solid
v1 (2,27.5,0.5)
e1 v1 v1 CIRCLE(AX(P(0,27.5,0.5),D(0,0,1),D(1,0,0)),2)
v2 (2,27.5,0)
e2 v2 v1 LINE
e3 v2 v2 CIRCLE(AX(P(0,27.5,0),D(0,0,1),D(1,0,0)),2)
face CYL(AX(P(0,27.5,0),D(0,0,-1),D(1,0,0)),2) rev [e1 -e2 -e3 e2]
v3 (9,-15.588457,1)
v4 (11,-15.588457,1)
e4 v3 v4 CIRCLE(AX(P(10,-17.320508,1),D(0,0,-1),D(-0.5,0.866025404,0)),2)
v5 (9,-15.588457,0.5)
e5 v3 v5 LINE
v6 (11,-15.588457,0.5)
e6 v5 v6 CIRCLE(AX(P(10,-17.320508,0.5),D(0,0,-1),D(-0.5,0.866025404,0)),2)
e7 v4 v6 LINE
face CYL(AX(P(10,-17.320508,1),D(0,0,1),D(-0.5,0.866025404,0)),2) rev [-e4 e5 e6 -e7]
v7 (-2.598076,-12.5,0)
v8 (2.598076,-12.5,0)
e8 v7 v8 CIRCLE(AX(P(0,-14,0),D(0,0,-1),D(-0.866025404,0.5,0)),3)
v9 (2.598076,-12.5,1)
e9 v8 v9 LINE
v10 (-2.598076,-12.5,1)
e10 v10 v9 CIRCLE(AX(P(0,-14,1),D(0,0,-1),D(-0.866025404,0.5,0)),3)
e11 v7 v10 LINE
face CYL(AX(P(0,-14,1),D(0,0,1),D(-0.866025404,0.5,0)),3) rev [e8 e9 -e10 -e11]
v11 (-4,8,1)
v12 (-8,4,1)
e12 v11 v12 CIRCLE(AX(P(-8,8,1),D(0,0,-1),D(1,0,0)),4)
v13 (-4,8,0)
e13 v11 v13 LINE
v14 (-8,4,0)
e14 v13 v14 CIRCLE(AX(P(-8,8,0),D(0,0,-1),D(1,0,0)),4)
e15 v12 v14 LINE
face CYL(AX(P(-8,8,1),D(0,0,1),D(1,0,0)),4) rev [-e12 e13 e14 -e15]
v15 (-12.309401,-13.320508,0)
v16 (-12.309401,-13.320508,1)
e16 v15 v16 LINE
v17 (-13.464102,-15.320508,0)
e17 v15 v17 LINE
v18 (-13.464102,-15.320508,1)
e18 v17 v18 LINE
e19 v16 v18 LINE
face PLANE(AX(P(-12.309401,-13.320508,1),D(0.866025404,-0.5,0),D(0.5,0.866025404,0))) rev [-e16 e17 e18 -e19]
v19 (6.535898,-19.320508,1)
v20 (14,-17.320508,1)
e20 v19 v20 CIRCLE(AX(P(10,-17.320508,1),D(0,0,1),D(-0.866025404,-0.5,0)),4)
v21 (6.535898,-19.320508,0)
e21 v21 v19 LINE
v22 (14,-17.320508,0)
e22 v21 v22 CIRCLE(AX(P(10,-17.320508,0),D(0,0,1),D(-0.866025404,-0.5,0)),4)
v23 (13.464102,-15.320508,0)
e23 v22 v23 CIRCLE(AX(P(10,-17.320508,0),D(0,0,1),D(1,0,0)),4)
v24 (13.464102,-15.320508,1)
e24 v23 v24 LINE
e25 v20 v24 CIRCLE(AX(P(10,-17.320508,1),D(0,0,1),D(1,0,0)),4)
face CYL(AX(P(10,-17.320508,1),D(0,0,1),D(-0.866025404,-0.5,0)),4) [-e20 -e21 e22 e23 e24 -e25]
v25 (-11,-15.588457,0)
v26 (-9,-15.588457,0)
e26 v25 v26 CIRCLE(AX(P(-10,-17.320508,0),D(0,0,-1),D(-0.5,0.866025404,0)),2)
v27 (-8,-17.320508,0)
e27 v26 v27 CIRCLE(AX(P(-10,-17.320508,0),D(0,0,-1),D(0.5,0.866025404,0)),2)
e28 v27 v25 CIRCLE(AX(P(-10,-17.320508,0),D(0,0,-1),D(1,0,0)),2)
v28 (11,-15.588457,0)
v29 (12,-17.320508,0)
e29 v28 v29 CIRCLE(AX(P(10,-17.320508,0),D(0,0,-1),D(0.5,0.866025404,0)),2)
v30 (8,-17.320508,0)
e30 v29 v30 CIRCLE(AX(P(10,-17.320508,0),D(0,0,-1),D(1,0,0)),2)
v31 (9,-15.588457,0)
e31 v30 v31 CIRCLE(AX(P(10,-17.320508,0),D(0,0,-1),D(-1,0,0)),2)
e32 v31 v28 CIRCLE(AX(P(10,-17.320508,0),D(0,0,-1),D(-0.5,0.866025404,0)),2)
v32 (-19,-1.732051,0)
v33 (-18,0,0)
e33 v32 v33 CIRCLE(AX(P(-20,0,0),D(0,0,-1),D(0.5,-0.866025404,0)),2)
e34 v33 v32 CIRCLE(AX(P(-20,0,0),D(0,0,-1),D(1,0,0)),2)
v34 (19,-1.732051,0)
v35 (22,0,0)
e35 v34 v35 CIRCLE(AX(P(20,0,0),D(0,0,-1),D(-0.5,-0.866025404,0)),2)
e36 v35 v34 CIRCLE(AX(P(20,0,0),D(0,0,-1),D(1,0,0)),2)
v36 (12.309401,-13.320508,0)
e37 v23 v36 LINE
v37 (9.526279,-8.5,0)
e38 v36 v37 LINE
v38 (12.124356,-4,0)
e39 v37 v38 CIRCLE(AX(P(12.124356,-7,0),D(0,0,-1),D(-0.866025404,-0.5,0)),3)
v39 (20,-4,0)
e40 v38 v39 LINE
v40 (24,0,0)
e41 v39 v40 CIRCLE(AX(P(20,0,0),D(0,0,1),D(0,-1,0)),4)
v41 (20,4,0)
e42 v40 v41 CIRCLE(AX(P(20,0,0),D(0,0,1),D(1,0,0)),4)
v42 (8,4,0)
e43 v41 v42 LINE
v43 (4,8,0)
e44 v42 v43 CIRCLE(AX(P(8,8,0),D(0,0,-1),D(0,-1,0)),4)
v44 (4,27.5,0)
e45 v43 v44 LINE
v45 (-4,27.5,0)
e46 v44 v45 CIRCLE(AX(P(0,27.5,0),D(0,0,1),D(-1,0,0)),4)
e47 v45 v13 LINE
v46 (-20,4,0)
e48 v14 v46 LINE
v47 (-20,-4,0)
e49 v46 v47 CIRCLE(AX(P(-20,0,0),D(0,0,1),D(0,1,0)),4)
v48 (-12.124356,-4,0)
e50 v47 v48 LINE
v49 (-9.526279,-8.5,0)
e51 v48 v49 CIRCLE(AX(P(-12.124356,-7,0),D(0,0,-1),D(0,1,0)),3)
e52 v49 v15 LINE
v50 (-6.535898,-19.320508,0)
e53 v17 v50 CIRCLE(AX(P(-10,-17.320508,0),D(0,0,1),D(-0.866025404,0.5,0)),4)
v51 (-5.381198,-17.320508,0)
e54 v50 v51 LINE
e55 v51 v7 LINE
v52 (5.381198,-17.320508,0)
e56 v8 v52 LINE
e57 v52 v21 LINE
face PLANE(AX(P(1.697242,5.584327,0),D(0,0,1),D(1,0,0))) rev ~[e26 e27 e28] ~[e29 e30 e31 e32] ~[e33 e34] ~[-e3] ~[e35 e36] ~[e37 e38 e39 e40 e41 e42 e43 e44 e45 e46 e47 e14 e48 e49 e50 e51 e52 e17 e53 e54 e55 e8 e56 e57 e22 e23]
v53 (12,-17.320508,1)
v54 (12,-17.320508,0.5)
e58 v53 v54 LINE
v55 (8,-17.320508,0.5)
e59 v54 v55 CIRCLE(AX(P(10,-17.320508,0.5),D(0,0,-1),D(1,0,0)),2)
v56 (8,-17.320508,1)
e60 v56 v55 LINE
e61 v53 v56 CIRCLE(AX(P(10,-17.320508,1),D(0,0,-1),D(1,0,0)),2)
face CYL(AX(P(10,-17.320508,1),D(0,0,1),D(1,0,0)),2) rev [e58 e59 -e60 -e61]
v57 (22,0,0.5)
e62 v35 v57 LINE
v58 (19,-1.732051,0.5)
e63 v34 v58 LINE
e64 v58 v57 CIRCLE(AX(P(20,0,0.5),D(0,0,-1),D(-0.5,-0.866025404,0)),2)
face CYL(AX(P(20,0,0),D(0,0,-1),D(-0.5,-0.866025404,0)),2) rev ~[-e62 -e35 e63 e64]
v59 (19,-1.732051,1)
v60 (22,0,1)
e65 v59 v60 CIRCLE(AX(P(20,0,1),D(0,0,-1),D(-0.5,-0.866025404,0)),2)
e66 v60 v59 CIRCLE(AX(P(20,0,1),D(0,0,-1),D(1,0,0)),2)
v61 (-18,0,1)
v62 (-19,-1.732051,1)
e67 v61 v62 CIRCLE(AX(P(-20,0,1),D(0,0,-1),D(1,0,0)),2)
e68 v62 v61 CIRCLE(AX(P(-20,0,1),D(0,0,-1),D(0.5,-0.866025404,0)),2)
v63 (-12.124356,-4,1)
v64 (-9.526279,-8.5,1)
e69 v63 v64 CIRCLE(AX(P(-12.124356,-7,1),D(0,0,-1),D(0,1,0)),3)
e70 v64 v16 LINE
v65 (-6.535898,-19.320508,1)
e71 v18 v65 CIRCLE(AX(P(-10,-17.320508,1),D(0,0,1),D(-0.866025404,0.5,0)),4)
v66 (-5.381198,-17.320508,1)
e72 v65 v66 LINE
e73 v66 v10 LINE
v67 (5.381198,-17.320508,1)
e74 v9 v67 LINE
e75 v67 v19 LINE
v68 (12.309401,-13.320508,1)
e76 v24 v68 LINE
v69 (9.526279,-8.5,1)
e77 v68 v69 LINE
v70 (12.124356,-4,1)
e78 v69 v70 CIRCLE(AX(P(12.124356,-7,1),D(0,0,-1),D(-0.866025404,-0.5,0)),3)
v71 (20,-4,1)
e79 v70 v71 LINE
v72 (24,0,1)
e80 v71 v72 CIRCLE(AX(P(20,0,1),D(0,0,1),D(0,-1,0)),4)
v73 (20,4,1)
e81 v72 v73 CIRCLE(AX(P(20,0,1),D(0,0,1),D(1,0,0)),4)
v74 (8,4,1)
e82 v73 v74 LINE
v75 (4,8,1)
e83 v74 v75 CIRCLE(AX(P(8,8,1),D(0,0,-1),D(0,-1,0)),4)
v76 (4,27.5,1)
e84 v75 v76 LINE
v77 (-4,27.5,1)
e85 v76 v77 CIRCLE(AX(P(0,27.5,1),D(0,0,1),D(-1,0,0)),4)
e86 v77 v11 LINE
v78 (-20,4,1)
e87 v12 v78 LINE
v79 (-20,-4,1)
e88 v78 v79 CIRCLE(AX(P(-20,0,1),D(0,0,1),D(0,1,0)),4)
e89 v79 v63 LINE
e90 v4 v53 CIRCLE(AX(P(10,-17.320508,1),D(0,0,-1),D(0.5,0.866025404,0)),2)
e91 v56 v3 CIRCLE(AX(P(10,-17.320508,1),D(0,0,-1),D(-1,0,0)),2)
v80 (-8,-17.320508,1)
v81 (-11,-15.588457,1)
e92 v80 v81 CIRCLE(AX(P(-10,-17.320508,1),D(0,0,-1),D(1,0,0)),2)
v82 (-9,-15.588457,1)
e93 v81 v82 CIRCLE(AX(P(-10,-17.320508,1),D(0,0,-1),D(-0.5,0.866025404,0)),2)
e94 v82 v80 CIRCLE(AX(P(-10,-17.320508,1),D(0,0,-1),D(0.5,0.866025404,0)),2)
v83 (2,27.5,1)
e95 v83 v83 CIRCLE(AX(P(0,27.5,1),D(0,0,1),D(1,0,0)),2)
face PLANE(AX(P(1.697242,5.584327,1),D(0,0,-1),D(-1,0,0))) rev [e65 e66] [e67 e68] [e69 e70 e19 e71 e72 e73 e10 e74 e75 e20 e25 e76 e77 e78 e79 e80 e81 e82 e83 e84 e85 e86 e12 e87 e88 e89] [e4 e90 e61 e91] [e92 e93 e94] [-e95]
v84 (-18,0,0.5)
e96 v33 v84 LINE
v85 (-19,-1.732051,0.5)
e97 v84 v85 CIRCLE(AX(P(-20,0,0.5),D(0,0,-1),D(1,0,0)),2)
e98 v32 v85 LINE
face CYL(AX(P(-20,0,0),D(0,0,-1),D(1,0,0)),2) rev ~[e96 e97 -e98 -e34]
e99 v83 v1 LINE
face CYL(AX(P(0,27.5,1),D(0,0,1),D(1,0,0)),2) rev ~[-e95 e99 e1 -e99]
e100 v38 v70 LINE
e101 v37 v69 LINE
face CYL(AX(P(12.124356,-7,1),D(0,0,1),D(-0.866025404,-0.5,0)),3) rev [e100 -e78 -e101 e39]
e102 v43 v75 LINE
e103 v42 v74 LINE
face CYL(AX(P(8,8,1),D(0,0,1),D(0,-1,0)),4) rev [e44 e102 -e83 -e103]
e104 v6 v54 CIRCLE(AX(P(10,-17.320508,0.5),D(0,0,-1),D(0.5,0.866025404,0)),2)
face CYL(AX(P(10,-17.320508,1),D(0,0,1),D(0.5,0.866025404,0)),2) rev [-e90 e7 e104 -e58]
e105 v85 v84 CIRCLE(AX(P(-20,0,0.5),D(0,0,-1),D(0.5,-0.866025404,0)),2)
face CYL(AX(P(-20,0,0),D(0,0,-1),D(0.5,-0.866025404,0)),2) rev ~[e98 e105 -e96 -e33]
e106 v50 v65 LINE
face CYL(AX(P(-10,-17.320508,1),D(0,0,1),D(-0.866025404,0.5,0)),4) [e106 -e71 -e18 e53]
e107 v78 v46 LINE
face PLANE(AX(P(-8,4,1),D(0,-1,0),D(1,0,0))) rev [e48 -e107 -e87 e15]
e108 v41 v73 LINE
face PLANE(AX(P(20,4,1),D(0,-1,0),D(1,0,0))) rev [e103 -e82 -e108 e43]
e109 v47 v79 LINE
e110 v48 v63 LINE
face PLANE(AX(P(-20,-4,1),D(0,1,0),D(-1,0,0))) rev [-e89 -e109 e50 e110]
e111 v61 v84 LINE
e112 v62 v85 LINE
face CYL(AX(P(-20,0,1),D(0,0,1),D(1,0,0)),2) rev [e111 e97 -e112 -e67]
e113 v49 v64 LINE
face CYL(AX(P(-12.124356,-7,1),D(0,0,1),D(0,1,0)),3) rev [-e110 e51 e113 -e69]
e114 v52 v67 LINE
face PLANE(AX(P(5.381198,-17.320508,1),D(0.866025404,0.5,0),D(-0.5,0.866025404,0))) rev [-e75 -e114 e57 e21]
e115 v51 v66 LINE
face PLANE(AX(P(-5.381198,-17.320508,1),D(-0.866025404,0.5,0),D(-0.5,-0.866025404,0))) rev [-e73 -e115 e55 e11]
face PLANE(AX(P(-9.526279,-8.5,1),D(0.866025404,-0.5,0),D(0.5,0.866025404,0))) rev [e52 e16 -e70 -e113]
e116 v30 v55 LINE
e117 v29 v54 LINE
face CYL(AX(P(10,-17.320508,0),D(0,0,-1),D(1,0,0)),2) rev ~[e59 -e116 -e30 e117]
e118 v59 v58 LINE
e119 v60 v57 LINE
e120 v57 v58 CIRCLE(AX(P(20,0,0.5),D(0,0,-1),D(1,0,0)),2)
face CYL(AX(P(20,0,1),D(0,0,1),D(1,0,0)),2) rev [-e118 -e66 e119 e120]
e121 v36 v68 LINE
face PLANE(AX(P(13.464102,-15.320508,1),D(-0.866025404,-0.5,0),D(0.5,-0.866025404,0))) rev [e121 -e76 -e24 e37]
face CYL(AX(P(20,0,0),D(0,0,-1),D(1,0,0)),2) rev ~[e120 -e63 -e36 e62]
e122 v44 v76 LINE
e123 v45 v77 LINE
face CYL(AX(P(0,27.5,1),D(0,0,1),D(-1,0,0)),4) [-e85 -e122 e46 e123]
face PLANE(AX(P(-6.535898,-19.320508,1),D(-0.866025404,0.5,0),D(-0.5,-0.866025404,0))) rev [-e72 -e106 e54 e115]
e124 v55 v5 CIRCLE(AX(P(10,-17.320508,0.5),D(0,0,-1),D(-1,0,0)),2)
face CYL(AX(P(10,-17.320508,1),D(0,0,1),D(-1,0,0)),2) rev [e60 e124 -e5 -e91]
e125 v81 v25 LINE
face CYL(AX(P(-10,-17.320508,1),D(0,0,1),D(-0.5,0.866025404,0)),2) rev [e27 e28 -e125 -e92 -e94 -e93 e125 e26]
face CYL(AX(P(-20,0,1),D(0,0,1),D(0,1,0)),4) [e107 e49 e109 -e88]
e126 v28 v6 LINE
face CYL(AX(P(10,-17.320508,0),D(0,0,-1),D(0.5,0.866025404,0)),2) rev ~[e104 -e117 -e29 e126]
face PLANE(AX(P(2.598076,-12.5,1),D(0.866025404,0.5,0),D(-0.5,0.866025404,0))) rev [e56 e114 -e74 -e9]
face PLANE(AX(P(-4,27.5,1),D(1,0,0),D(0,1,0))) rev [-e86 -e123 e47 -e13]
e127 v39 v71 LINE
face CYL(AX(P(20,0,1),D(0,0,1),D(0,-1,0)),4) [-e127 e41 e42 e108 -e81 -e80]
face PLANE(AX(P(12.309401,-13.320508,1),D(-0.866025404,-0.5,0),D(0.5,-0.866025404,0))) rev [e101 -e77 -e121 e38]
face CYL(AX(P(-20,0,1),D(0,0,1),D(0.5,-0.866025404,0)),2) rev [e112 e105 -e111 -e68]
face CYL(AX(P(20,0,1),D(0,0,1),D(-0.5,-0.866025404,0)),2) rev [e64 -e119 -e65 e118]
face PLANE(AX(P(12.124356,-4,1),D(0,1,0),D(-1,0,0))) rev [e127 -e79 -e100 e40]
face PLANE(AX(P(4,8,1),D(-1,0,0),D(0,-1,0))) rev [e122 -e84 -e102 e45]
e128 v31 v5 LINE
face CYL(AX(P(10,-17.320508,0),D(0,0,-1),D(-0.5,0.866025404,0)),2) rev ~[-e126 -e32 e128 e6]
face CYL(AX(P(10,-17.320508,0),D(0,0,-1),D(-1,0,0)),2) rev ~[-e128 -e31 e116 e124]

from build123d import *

# Parameters (mm, degrees)
F0_R     = 2
F1_DEPTH = 0.5


# Not quite as in the source:
# - a pattern or mirror of a feature is missing from the dataset's text; its kind, count and spacing are read off the source's solid


with BuildPart() as f1:
    # F0 (on Top) → F1 (new body)
    with BuildSketch(Plane.XY):
        with BuildLine():
            ThreePointArc((-20, 4), (-17.1715728753, 2.8284271247), (-16, 0))
            Line((-16, 0), (0, 0))
            Line((0, 0), (8, -13.8564064606))
            ThreePointArc((8, -13.8564064606), (10, -13.3205080757), (12, -13.8564064606))
            Line((12, -13.8564064606), (12.3094010768, -13.3205080757))
            Line((12.3094010768, -13.3205080757), (9.5262794416, -8.5))
            ThreePointArc((9.5262794416, -8.5), (9.5262794416, -5.5), (12.124355653, -4))
            Line((12.124355653, -4), (17.6905989232, -4))
            Line((17.6905989232, -4), (18, -3.4641016151))
            ThreePointArc((18, -3.4641016151), (16.1362966948, 1.0352761804), (20, 4))
            Line((20, 4), (8, 4))
            ThreePointArc((8, 4), (5.1715728753, 5.1715728753), (4, 8))
            Line((4, 8), (4, 27.5))
            ThreePointArc((4, 27.5), (0, 23.5), (-4, 27.5))
            Line((-4, 27.5), (-4, 8))
            ThreePointArc((-4, 8), (-5.1715728753, 5.1715728753), (-8, 4))
            Line((-8, 4), (-20, 4))
        make_face()
        with BuildLine():
            Line((0, 0), (-16, 0))
            ThreePointArc((-16, 0), (-16.5358983849, -2), (-18, -3.4641016151))
            Line((-18, -3.4641016151), (-17.6905989232, -4))
            Line((-17.6905989232, -4), (-12.124355653, -4))
            ThreePointArc((-12.124355653, -4), (-9.5262794416, -5.5), (-9.5262794416, -8.5))
            Line((-9.5262794416, -8.5), (-12.3094010768, -13.3205080757))
            Line((-12.3094010768, -13.3205080757), (-12, -13.8564064606))
            ThreePointArc((-12, -13.8564064606), (-10, -13.3205080757), (-8, -13.8564064606))
            Line((-8, -13.8564064606), (0, 0))
        make_face()
        with BuildLine():
            Line((8, -13.8564064606), (0, 0))
            Line((0, 0), (-8, -13.8564064606))
            ThreePointArc((-8, -13.8564064606), (-6.5358983849, -15.3205080757), (-6, -17.3205080757))
            Line((-6, -17.3205080757), (-5.3811978465, -17.3205080757))
            Line((-5.3811978465, -17.3205080757), (-2.5980762114, -12.5))
            ThreePointArc((-2.5980762114, -12.5), (0, -11), (2.5980762114, -12.5))
            Line((2.5980762114, -12.5), (5.3811978465, -17.3205080757))
            Line((5.3811978465, -17.3205080757), (6, -17.3205080757))
            ThreePointArc((6, -17.3205080757), (6.5358983849, -15.3205080757), (8, -13.8564064606))
        make_face()
        with BuildLine():
            Line((-9, -15.5884572681), (-8, -13.8564064606))
            ThreePointArc((-8, -13.8564064606), (-10, -13.3205080757), (-12, -13.8564064606))
            Line((-12, -13.8564064606), (-11, -15.5884572681))
            ThreePointArc((-11, -15.5884572681), (-10, -15.3205080757), (-9, -15.5884572681))
        make_face()
        with BuildLine():
            ThreePointArc((-6.5358983849, -19.3205080757), (-6.1362966948, -18.3557842561), (-6, -17.3205080757))
            Line((-6, -17.3205080757), (-8, -17.3205080757))
            ThreePointArc((-8, -17.3205080757), (-11, -19.0525588833), (-11, -15.5884572681))
            Line((-11, -15.5884572681), (-12, -13.8564064606))
            ThreePointArc((-12, -13.8564064606), (-12.8284271247, -14.4920809509), (-13.4641016151, -15.3205080757))
            ThreePointArc((-13.4641016151, -15.3205080757), (-12, -20.7846096908), (-6.5358983849, -19.3205080757))
        make_face()
        with BuildLine():
            ThreePointArc((-6, -17.3205080757), (-6.5358983849, -15.3205080757), (-8, -13.8564064606))
            Line((-8, -13.8564064606), (-9, -15.5884572681))
            ThreePointArc((-9, -15.5884572681), (-8.2679491924, -16.3205080757), (-8, -17.3205080757))
            Line((-8, -17.3205080757), (-6, -17.3205080757))
        make_face()
        with BuildLine():
            ThreePointArc((13.4641016151, -15.3205080757), (12.8284271247, -14.4920809509), (12, -13.8564064606))
            Line((12, -13.8564064606), (11, -15.5884572681))
            ThreePointArc((11, -15.5884572681), (11.7320508076, -16.3205080757), (12, -17.3205080757))
            ThreePointArc((12, -17.3205080757), (10, -19.3205080757), (8, -17.3205080757))
            Line((8, -17.3205080757), (6, -17.3205080757))
            ThreePointArc((6, -17.3205080757), (6.1362966948, -18.3557842561), (6.5358983849, -19.3205080757))
            ThreePointArc((6.5358983849, -19.3205080757), (11.0352761804, -21.1842113808), (14, -17.3205080757))
            ThreePointArc((14, -17.3205080757), (13.8637033052, -16.2852318953), (13.4641016151, -15.3205080757))
        make_face()
        with BuildLine():
            Line((9, -15.5884572681), (8, -13.8564064606))
            ThreePointArc((8, -13.8564064606), (6.5358983849, -15.3205080757), (6, -17.3205080757))
            Line((6, -17.3205080757), (8, -17.3205080757))
            ThreePointArc((8, -17.3205080757), (8.2679491924, -16.3205080757), (9, -15.5884572681))
        make_face()
        with BuildLine():
            ThreePointArc((12, -13.8564064606), (10, -13.3205080757), (8, -13.8564064606))
            Line((8, -13.8564064606), (9, -15.5884572681))
            ThreePointArc((9, -15.5884572681), (10, -15.3205080757), (11, -15.5884572681))
            Line((11, -15.5884572681), (12, -13.8564064606))
        make_face()
        with BuildLine():
            ThreePointArc((-19, -1.7320508076), (-21.7320508076, 1), (-18, 0))
            Line((-18, 0), (-16, 0))
            ThreePointArc((-16, 0), (-17.1715728753, 2.8284271247), (-20, 4))
            ThreePointArc((-20, 4), (-24, 0), (-20, -4))
            ThreePointArc((-20, -4), (-18.9647238196, -3.8637033052), (-18, -3.4641016151))
            Line((-18, -3.4641016151), (-19, -1.7320508076))
        make_face()
        with BuildLine():
            Line((-16, 0), (-18, 0))
            ThreePointArc((-18, 0), (-18.2679491924, -1), (-19, -1.7320508076))
            Line((-19, -1.7320508076), (-18, -3.4641016151))
            ThreePointArc((-18, -3.4641016151), (-16.5358983849, -2), (-16, 0))
        make_face()
        with BuildLine():
            ThreePointArc((20, 4), (16.1362966948, 1.0352761804), (18, -3.4641016151))
            ThreePointArc((18, -3.4641016151), (18.9647238196, -3.8637033052), (20, -4))
            ThreePointArc((20, -4), (22.8284271247, -2.8284271247), (24, 0))
            ThreePointArc((24, 0), (22.8284271247, 2.8284271247), (20, 4))
        make_face()
        with BuildLine():
            ThreePointArc((22, 0), (21, -1.7320508076), (19, -1.7320508076))
            ThreePointArc((19, -1.7320508076), (19, 1.7320508076), (22, 0))
        make_face(mode=Mode.SUBTRACT)
        with BuildLine():
            ThreePointArc((4, 27.5), (0, 31.5), (-4, 27.5))
            ThreePointArc((-4, 27.5), (0, 23.5), (4, 27.5))
        make_face()
        with Locations((0, 27.5)):
            Circle(F0_R, mode=Mode.SUBTRACT)
        with BuildLine():
            Line((-17.6905989232, -4), (-18, -3.4641016151))
            ThreePointArc((-18, -3.4641016151), (-18.9647238196, -3.8637033052), (-20, -4))
            Line((-20, -4), (-17.6905989232, -4))
        make_face()
        with BuildLine():
            Line((-12, -13.8564064606), (-12.3094010768, -13.3205080757))
            Line((-12.3094010768, -13.3205080757), (-13.4641016151, -15.3205080757))
            ThreePointArc((-13.4641016151, -15.3205080757), (-12.8284271247, -14.4920809509), (-12, -13.8564064606))
        make_face()
        with BuildLine():
            Line((-5.3811978465, -17.3205080757), (-6, -17.3205080757))
            ThreePointArc((-6, -17.3205080757), (-6.1362966948, -18.3557842561), (-6.5358983849, -19.3205080757))
            Line((-6.5358983849, -19.3205080757), (-5.3811978465, -17.3205080757))
        make_face()
        with BuildLine():
            ThreePointArc((6.5358983849, -19.3205080757), (6.1362966948, -18.3557842561), (6, -17.3205080757))
            Line((6, -17.3205080757), (5.3811978465, -17.3205080757))
            Line((5.3811978465, -17.3205080757), (6.5358983849, -19.3205080757))
        make_face()
        with BuildLine():
            Line((12.3094010768, -13.3205080757), (12, -13.8564064606))
            ThreePointArc((12, -13.8564064606), (12.8284271247, -14.4920809509), (13.4641016151, -15.3205080757))
            Line((13.4641016151, -15.3205080757), (12.3094010768, -13.3205080757))
        make_face()
        with BuildLine():
            Line((18, -3.4641016151), (17.6905989232, -4))
            Line((17.6905989232, -4), (20, -4))
            ThreePointArc((20, -4), (18.9647238196, -3.8637033052), (18, -3.4641016151))
        make_face()
    extrude(amount=F1_DEPTH)

    # F1_copies: F1 across plane


with BuildPart() as f1_1:
    add(f1.part)
    add(f1.part.mirror(Plane.XY.offset(0.5)))


solid = f1_1.part
